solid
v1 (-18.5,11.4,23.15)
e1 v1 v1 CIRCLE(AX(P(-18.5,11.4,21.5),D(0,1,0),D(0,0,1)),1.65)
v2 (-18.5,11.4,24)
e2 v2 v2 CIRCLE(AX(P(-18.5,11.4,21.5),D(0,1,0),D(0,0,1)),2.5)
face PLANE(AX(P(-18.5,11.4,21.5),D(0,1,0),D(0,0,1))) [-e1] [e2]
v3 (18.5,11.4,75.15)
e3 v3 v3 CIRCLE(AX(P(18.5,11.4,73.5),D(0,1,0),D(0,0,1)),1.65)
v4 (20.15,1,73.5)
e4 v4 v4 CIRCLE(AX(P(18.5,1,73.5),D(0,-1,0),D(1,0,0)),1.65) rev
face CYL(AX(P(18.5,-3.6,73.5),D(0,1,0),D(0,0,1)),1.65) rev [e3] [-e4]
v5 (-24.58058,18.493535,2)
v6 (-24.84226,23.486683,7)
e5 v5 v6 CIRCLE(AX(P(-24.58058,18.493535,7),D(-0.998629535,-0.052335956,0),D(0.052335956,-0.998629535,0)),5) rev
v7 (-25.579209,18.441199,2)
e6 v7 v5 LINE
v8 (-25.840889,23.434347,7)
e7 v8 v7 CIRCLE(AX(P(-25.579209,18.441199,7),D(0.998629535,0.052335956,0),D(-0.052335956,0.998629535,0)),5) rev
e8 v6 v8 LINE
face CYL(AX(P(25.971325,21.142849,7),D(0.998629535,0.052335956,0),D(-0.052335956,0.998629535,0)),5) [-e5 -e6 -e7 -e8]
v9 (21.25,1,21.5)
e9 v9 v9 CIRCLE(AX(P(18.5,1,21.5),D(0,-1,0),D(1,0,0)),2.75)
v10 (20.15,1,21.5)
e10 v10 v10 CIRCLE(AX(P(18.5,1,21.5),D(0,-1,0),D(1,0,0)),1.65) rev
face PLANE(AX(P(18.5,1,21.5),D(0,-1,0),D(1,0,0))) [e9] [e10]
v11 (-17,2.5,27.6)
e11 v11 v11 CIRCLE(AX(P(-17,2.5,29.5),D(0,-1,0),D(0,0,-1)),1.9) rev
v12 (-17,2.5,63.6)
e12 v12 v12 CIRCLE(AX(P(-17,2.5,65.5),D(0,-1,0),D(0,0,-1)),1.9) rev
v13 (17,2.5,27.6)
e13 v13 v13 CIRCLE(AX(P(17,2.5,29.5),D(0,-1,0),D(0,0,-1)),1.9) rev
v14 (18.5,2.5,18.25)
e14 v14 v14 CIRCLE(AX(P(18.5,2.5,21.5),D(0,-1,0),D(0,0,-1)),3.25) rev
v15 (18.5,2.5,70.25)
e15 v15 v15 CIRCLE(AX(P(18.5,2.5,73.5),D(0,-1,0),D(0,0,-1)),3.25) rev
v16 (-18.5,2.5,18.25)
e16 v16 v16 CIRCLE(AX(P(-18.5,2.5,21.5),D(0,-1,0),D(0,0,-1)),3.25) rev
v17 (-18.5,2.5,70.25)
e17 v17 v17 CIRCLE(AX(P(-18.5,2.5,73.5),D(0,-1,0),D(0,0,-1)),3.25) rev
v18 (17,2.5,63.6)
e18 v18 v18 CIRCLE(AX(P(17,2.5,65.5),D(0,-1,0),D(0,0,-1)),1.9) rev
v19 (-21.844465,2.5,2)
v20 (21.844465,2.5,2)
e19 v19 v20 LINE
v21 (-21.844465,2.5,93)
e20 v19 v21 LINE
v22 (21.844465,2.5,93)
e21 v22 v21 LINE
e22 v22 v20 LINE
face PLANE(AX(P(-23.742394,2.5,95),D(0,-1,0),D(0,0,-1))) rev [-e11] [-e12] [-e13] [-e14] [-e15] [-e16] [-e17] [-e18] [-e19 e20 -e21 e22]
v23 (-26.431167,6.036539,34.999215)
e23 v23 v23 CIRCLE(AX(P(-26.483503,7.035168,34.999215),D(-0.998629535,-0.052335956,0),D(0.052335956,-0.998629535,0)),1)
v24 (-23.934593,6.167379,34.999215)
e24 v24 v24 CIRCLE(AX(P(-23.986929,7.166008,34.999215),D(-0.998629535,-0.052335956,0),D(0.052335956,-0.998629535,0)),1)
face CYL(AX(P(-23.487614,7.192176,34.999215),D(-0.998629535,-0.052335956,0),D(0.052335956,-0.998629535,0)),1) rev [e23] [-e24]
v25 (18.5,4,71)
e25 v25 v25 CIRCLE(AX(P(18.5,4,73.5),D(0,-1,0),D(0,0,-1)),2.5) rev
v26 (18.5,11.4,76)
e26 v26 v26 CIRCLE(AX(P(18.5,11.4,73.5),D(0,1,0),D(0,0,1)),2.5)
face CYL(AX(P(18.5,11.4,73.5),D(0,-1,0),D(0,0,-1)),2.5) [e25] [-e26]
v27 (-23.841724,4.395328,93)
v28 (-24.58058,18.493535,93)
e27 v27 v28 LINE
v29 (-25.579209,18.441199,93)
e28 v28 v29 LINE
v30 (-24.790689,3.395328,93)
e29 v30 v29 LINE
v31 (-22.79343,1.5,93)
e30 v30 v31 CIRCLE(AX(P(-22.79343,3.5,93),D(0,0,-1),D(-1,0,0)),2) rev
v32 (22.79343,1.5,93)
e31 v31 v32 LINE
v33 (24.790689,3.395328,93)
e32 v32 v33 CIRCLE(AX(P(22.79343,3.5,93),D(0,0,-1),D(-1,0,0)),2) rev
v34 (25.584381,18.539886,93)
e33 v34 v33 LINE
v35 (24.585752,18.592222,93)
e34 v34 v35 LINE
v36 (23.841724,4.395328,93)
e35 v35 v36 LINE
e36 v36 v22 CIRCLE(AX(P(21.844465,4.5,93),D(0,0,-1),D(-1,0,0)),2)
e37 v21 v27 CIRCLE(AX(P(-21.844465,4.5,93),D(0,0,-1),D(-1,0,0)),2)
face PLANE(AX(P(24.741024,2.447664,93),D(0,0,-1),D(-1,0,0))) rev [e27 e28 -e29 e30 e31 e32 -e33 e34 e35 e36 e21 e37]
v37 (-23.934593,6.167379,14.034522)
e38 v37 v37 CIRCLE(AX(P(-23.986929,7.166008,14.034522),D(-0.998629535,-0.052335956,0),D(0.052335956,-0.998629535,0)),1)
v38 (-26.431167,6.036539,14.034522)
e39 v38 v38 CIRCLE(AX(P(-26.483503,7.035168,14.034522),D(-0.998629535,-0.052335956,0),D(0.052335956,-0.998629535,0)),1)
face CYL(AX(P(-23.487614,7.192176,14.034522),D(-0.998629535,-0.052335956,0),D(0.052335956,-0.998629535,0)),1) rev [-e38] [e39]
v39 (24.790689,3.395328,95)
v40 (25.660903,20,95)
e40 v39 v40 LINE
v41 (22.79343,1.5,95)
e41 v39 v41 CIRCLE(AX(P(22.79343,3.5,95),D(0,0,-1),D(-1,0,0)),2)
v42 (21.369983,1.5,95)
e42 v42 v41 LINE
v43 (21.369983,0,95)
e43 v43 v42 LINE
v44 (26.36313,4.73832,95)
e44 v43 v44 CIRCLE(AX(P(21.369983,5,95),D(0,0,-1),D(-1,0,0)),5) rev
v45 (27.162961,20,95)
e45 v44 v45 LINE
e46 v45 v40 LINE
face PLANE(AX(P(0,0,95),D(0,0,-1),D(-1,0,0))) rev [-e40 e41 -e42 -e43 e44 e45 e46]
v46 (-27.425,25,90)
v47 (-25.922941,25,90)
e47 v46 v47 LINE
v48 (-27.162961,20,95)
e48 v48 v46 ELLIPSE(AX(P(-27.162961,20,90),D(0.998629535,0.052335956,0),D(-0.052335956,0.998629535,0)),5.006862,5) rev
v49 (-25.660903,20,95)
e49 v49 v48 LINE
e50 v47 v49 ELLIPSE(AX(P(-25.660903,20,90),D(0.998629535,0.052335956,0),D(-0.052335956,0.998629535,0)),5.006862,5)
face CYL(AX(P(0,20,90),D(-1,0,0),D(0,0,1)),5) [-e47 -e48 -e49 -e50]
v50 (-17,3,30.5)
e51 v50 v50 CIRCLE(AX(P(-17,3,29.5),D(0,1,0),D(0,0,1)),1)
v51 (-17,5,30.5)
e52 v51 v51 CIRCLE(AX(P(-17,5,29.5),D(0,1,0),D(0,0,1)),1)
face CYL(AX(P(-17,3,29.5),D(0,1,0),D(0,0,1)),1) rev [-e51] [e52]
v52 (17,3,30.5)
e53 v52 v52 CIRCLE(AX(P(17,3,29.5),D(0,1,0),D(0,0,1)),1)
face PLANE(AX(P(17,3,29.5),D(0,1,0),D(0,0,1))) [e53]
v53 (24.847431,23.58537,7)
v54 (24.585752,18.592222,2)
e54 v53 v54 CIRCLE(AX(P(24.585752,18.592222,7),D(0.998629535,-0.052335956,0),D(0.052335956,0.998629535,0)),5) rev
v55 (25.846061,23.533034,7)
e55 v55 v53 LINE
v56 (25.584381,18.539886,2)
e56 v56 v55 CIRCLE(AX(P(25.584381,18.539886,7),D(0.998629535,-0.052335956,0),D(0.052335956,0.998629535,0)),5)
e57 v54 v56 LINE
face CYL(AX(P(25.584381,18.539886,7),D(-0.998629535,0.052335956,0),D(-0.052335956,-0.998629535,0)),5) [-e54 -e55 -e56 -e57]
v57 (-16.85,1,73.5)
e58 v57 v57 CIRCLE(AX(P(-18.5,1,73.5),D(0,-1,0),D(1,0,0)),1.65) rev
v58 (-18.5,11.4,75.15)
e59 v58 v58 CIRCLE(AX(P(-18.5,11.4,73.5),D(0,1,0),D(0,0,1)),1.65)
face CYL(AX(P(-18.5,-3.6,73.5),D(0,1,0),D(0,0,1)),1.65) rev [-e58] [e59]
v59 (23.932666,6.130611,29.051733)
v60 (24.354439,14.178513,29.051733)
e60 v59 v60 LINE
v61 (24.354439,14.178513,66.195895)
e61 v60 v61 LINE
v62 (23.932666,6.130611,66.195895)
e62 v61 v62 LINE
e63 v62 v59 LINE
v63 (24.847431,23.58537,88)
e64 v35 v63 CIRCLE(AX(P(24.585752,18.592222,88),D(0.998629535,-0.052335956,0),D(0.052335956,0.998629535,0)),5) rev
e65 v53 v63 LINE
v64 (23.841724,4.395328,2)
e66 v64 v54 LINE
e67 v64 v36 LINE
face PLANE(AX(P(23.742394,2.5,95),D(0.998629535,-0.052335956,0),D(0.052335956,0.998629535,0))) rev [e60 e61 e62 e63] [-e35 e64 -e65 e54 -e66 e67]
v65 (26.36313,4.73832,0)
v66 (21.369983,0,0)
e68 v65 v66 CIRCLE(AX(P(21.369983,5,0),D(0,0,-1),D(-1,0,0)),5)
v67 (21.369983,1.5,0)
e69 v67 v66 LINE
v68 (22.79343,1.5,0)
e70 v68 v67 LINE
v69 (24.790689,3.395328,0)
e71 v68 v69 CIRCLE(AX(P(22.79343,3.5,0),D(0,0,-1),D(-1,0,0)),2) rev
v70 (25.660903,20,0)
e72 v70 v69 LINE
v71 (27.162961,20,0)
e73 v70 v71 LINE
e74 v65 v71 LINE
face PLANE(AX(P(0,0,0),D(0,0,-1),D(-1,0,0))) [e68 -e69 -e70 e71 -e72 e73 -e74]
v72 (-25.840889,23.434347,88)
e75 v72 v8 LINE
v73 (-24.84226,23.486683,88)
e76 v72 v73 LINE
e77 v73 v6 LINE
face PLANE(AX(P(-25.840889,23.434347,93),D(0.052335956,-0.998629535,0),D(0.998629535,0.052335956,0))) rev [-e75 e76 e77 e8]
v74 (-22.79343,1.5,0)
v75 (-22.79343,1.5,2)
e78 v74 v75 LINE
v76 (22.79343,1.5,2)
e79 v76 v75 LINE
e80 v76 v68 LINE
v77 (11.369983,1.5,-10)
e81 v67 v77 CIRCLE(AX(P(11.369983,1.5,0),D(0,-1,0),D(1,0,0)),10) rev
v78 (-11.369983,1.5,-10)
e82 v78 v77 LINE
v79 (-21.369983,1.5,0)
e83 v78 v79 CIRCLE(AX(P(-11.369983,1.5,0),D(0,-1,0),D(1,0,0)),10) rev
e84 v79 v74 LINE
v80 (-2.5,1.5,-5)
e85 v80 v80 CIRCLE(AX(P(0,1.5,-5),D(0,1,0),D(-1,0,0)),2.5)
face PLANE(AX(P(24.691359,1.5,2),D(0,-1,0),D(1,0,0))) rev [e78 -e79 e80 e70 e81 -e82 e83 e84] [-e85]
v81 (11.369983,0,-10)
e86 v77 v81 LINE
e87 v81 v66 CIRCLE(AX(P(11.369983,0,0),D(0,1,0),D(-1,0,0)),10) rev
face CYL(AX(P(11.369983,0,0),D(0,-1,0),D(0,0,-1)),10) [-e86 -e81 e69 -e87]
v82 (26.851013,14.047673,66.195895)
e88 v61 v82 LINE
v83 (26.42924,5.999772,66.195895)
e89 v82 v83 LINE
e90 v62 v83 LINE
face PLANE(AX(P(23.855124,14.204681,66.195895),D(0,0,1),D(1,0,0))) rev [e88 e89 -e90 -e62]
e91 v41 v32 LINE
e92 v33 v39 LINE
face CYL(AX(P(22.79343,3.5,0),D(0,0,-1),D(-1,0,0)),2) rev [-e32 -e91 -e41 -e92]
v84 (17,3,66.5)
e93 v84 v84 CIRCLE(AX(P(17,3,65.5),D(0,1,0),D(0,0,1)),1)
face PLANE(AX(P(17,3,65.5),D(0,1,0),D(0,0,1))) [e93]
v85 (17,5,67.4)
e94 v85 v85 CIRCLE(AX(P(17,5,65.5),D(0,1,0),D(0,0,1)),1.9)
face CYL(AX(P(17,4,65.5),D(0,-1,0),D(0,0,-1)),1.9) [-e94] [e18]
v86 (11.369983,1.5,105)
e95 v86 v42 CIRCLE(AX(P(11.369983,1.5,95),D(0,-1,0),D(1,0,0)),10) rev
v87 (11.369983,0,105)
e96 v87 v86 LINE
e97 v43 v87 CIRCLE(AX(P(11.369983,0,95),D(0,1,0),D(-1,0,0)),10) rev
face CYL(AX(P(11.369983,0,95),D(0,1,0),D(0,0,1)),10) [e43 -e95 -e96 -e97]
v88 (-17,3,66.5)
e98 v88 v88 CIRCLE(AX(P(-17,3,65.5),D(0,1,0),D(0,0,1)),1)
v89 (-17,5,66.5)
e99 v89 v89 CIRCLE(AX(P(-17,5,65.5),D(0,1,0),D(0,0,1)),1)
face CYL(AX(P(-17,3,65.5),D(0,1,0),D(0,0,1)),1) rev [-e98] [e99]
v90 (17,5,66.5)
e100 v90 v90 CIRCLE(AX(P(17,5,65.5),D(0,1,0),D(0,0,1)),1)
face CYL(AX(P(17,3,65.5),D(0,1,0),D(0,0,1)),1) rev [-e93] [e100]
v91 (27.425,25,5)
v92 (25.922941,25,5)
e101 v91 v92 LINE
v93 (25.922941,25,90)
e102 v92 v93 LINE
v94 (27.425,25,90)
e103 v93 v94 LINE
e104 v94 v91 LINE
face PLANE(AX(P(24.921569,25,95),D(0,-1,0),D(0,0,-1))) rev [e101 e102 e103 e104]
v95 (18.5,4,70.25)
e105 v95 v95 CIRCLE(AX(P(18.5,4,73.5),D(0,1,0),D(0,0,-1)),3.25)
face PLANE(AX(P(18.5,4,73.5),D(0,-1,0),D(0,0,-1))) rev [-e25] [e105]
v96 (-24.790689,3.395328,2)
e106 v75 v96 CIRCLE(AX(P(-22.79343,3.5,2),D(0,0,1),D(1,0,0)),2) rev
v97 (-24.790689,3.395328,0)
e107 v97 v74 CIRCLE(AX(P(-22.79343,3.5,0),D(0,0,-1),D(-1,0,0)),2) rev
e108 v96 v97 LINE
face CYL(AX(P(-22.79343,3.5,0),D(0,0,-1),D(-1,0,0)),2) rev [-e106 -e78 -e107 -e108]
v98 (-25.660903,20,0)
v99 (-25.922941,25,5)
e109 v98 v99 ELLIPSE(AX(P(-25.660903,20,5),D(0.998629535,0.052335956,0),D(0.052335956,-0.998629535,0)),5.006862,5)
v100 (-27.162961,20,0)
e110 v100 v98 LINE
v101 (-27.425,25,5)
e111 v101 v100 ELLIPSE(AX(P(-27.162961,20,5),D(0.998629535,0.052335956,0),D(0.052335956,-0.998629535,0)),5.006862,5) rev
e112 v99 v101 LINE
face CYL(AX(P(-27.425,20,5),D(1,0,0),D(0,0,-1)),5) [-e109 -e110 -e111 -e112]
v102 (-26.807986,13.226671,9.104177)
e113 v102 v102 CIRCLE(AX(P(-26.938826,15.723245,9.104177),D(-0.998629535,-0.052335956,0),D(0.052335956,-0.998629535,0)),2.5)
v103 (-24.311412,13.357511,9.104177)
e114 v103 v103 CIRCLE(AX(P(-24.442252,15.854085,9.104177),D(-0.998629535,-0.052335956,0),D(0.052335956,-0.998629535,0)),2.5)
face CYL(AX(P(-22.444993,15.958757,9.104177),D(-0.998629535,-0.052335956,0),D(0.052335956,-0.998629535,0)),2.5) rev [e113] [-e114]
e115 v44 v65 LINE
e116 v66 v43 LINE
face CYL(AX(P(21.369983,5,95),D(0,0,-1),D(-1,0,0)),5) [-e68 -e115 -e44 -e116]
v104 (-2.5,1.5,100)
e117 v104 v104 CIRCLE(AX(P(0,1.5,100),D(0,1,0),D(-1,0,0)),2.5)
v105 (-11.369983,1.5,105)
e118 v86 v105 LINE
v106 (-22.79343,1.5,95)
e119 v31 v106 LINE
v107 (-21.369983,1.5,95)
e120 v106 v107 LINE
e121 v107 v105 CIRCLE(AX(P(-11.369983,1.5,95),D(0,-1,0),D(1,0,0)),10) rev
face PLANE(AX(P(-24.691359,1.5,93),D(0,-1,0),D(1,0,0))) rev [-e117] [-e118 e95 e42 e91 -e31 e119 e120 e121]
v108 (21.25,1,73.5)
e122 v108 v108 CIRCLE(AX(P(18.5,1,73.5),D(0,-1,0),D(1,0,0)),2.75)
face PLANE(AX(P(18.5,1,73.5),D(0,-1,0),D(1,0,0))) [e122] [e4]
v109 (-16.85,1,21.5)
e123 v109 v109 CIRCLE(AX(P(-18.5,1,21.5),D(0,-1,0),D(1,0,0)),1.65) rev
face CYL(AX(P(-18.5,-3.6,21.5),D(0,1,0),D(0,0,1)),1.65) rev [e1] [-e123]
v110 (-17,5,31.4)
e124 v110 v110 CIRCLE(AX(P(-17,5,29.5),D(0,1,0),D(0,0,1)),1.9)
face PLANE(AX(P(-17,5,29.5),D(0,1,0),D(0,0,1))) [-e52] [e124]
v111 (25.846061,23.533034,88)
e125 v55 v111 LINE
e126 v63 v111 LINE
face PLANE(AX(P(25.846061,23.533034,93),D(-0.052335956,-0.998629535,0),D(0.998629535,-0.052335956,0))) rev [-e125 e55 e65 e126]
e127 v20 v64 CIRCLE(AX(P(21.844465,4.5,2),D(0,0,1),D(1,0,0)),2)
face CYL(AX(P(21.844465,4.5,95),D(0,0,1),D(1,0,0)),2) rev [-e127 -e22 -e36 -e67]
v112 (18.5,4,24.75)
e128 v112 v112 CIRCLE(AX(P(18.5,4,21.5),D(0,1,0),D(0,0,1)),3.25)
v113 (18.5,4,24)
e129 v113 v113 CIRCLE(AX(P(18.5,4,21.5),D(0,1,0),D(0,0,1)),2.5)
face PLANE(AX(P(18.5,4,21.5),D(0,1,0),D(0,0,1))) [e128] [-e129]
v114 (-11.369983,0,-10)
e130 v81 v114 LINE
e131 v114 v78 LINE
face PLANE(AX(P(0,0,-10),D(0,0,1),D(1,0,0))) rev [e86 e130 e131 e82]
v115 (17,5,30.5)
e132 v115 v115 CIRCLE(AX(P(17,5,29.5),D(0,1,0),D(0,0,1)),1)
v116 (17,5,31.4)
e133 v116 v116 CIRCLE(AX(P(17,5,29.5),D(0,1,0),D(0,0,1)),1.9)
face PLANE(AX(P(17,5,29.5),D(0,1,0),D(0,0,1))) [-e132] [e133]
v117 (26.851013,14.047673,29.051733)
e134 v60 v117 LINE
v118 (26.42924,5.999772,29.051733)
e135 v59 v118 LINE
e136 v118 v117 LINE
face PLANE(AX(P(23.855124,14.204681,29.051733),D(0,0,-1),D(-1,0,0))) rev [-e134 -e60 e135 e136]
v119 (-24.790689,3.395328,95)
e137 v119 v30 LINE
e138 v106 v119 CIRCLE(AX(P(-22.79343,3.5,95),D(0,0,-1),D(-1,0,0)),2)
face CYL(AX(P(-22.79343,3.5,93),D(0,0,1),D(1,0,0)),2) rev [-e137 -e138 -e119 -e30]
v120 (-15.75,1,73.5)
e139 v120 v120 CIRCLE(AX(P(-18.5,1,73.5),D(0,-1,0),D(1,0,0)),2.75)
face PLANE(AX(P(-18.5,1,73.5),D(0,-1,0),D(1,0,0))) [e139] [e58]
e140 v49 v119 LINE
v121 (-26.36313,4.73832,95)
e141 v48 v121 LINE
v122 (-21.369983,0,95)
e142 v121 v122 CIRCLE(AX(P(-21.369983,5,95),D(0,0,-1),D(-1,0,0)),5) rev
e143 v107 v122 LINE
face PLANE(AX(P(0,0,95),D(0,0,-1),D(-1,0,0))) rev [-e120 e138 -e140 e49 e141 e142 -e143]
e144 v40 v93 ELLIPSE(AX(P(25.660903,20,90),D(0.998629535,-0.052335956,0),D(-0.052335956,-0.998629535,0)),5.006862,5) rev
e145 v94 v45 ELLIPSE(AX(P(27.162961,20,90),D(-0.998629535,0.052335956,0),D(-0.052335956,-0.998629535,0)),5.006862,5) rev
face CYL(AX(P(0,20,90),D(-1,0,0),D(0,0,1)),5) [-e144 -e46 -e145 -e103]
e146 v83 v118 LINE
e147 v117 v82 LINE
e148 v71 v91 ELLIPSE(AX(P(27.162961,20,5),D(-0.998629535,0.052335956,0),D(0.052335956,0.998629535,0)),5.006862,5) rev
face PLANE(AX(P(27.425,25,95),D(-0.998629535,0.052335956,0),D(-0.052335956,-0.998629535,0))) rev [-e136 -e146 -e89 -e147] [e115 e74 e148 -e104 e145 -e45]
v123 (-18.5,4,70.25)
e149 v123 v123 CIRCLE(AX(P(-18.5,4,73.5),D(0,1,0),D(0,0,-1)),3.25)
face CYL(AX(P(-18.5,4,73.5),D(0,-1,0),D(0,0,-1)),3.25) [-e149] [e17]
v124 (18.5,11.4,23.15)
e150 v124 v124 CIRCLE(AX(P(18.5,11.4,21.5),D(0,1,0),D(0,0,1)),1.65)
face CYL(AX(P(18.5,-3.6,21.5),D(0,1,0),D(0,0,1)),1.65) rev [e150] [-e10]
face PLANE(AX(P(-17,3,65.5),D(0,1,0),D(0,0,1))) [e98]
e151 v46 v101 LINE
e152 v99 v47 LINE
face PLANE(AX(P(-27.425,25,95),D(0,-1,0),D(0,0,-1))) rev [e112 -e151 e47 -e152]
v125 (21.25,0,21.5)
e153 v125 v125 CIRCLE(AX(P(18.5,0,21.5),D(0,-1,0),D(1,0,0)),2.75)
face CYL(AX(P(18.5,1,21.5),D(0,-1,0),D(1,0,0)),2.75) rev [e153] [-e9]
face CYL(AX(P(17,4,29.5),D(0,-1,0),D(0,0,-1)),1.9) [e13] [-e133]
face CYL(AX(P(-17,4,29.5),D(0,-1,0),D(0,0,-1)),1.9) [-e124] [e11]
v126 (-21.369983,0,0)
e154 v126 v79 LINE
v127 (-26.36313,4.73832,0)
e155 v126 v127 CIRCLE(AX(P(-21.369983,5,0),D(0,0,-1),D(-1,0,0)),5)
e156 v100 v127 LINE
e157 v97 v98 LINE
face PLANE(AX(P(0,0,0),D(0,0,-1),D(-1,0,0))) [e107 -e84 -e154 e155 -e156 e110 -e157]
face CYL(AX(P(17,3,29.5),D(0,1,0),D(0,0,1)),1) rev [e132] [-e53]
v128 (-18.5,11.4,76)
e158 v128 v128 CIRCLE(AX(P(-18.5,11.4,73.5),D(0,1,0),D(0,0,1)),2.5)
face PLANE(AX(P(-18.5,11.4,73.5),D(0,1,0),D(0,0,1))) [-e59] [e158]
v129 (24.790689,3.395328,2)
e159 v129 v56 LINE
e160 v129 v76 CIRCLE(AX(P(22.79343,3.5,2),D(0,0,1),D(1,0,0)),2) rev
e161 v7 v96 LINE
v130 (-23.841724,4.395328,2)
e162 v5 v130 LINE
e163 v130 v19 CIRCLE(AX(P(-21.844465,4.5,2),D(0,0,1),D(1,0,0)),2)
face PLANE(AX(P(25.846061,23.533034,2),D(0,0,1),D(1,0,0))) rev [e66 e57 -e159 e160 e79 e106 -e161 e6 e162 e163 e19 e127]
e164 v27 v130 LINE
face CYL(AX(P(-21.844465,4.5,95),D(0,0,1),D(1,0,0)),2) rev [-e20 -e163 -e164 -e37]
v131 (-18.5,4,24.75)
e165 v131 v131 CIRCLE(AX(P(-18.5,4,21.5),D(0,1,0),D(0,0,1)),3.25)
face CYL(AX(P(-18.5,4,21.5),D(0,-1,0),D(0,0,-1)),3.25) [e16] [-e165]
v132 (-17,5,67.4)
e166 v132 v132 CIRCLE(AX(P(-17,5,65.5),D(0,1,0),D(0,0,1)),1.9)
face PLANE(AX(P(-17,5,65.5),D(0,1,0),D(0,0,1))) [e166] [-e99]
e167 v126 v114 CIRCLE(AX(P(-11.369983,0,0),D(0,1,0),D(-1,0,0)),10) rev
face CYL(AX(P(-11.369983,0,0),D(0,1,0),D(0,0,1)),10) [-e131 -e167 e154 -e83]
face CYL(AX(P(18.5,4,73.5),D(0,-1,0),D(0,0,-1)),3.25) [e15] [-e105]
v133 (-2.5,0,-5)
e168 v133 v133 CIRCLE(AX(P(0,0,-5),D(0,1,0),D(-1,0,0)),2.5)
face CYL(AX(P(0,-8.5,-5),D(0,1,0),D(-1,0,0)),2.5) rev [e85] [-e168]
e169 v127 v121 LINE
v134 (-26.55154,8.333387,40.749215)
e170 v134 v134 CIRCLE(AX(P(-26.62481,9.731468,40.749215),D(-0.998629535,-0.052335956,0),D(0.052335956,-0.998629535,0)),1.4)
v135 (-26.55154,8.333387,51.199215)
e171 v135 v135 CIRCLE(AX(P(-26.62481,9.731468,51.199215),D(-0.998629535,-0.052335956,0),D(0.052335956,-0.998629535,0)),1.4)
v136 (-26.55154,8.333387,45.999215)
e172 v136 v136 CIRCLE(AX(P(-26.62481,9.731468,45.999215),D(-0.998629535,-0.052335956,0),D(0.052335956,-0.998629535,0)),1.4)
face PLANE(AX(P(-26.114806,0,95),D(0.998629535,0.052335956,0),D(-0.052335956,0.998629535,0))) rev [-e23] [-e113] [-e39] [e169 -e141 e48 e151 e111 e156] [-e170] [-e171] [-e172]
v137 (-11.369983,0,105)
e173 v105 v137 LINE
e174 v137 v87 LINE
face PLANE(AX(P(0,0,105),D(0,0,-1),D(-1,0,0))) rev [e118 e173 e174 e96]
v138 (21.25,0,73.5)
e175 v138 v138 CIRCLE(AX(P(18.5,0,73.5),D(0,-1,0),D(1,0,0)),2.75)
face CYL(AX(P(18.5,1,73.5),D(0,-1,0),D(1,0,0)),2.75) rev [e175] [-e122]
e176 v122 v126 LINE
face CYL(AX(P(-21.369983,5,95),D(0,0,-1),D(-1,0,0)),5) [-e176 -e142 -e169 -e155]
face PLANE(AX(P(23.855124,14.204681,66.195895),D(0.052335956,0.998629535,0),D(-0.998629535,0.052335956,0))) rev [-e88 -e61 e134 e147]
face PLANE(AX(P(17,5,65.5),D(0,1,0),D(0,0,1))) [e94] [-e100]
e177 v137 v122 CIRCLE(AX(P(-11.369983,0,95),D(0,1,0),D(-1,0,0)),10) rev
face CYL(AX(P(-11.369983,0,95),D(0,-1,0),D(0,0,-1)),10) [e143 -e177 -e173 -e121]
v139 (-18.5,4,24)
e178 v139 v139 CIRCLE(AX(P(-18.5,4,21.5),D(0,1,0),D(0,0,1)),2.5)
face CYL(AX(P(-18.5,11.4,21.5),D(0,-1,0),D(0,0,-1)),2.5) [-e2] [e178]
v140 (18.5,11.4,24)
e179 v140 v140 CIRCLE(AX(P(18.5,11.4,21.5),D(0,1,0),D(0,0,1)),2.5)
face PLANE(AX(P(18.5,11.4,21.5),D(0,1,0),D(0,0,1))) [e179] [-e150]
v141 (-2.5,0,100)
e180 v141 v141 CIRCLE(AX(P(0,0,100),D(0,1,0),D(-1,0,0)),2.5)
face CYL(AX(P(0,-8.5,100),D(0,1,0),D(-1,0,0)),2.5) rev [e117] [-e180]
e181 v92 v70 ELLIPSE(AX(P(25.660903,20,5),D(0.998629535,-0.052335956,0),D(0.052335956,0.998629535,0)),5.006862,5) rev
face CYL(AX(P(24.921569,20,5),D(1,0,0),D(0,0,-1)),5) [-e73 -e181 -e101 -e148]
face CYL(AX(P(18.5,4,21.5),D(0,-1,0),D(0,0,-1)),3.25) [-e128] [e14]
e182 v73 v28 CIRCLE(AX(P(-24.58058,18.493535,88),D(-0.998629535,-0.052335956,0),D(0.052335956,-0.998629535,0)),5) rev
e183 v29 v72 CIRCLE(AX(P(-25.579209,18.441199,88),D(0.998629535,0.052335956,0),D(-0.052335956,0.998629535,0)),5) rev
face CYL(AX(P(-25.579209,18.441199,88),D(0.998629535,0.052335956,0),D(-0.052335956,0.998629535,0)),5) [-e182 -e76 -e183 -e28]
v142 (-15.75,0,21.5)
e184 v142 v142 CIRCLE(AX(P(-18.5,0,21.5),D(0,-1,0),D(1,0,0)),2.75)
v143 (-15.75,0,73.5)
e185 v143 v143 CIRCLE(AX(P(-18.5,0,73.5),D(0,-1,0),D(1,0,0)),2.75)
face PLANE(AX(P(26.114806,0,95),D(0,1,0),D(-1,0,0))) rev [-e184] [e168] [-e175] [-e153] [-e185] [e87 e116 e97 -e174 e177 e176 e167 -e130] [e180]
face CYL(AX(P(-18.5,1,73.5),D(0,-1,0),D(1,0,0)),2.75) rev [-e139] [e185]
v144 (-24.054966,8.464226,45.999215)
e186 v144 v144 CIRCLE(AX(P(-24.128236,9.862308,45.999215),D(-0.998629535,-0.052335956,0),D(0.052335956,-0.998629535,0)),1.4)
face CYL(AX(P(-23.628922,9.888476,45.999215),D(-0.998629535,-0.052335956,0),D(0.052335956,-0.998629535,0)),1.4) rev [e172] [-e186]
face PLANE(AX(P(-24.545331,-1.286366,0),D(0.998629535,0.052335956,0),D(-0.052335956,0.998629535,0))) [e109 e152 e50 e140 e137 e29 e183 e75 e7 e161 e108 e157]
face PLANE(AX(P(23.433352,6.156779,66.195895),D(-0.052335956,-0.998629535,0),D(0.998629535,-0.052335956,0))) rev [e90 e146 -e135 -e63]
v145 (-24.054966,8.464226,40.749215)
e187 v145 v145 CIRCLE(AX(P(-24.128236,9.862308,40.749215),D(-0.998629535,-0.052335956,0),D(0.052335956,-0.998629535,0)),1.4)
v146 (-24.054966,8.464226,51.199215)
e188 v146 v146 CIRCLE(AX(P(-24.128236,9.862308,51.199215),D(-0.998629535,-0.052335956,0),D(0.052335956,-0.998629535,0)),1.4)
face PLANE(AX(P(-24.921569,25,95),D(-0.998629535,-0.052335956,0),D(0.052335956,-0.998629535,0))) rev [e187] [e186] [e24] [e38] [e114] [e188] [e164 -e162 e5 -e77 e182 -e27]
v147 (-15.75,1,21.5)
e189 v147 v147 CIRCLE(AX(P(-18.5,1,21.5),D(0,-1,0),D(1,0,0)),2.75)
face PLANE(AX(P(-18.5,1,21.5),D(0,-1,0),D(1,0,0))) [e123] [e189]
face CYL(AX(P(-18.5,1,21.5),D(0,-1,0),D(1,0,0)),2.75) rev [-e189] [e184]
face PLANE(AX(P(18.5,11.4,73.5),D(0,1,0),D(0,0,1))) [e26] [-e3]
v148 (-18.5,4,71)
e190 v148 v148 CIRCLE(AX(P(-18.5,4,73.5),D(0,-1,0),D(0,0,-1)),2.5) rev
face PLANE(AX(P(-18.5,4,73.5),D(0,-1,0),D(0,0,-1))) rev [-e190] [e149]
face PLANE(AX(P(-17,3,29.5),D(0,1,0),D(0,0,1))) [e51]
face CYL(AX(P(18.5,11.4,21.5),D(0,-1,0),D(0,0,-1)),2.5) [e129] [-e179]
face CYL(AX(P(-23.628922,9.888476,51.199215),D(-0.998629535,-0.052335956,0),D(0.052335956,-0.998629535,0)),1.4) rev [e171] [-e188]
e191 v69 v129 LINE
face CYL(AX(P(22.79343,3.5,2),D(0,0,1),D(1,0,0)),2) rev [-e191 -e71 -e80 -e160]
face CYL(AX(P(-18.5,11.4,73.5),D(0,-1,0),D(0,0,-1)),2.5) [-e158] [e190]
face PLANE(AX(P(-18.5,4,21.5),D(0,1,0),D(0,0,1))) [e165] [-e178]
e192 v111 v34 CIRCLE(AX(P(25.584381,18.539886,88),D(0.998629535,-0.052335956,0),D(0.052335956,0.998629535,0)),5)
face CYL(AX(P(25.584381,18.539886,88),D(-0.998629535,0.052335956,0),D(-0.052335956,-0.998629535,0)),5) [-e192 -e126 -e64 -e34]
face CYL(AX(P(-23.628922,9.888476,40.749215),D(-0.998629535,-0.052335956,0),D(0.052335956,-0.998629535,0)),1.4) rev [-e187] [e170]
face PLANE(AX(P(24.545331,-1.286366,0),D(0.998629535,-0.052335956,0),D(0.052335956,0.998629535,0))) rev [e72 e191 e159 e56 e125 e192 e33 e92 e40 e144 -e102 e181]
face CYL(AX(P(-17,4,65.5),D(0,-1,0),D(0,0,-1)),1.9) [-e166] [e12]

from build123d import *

# Parameters (mm, degrees)
BOSS_EXTRUDE1_DEPTH = 95
CUT_EXTRUDE1_DEPTH  = 1
CUT_EXTRUDE2_DEPTH  = 1
CUT_EXTRUDE4_DEPTH  = 2
CUT_EXTRUDE5_DEPTH  = 2
FILLET1_R           = 2
FILLET2_R           = 5
FILLET3_R           = 5
SKETCH11_R          = 3.25
SKETCH11_R_2        = 1.9
BOSS_EXTRUDE2_DEPTH = 1.5
SKETCH13_R          = 2.5
BOSS_EXTRUDE3_DEPTH = 7.4
SKETCH14_R          = 1.9
BOSS_EXTRUDE4_DEPTH = 1
SKETCH15_R          = 1.65
CUT_EXTRUDE7_DEPTH  = 15
SKETCH16_R          = 2.75
CUT_EXTRUDE8_DEPTH  = 1
SKETCH17_R          = 1
CUT_EXTRUDE9_DEPTH  = 2
SKETCH18_W          = 37.144162516
SKETCH18_H          = 8.058946384
CUT_EXTRUDE10_DEPTH = 3
SKETCH19_R          = 1
SKETCH19_R_2        = 1.4
CUT_EXTRUDE11_DEPTH = 3
SKETCH20_W          = 42.739965368
SKETCH20_H          = 1.5
BOSS_EXTRUDE5_DEPTH = 10
FILLET4_R           = 10
SKETCH21_W          = 42.739965368
SKETCH21_H          = 1.5
BOSS_EXTRUDE6_DEPTH = 10
FILLET5_R           = 10
SKETCH22_R          = 2.5
CUT_EXTRUDE12_DEPTH = 10
SKETCH23_R          = 2.5
CUT_EXTRUDE13_DEPTH = 4.5


with BuildPart() as part:
    # Sketch1 → Boss-Extrude1 (new body)
    with BuildSketch(Plane.XY):
        Polygon((-26.114805518, 0), (-27.425, 25), (-24.921569135, 25), (-23.742394101, 2.5), (23.742394101, 2.5), (24.921569135, 25), (27.425, 25), (26.114805518, 0), align=None)
    extrude(amount=BOSS_EXTRUDE1_DEPTH)

    # Sketch2 → Cut-Extrude1 (cut)
    with BuildSketch(Plane(origin=(23.546701863, -1.234030354, 0), x_dir=(0, 0, 1), z_dir=(-0.9986295347545742, 0.052335956242940705, 0))):
        Polygon((93, 3.739154736), (93, 24.853460661), (2, 24.853460661), (2, 3.739154736), (0, 3.739154736), (0, 26.853460661), (95, 26.853460661), (95, 3.739154736), align=None)
    extrude(amount=-CUT_EXTRUDE1_DEPTH, mode=Mode.SUBTRACT)

    # Sketch4 → Cut-Extrude2 (cut)
    with BuildSketch(Plane(origin=(-23.546701863, -1.234030354, 0), x_dir=(0, 0, -1), z_dir=(0.9986295347545742, 0.052335956242940414, 0))):
        Polygon((-95, 3.739154736), (-93, 3.739154736), (-93, 24.754638821), (-2, 24.754638821), (-2, 3.739154736), (0, 3.739154736), (0, 26.754638821), (-95, 26.754638821), align=None)
    extrude(amount=-CUT_EXTRUDE2_DEPTH, mode=Mode.SUBTRACT)

    # Sketch9 → Cut-Extrude4 (cut)
    with BuildSketch(Plane.XY.offset(95)):
        Polygon((-24.741023636, 2.447664044), (-24.691358668, 1.5), (24.691358668, 1.5), (24.743766447, 2.5), (23.742394101, 2.5), (-23.742394101, 2.5), (-24.743766447, 2.5), align=None)
    extrude(amount=-CUT_EXTRUDE4_DEPTH, mode=Mode.SUBTRACT)

    # Sketch10 → Cut-Extrude5 (cut)
    with BuildSketch(Plane(origin=(0, 0, 0), x_dir=(-1, 0, 0), z_dir=(0, 0, -1))):
        Polygon((-24.741023636, 2.447664044), (-24.691358668, 1.5), (24.691358668, 1.5), (24.741023636, 2.447664044), (24.743766447, 2.5), (23.742394101, 2.5), (-23.742394101, 2.5), (-24.743766447, 2.5), align=None)
    extrude(amount=-CUT_EXTRUDE5_DEPTH, mode=Mode.SUBTRACT)

    # Fillet1
    fillet1_edges = [part.edges().sort_by_distance(p)[0] for p in [
        (24.691358668, 1.5, 1),
        (-24.691358668, 1.5, 1),
        (23.742394101, 2.5, 47.5),
        (-23.742394101, 2.5, 47.5),
        (-24.691358668, 1.5, 94),
        (24.691358668, 1.5, 94),
    ]]
    fillet(fillet1_edges, radius=FILLET1_R)

    # Fillet2
    fillet2_edges = [part.edges().sort_by_distance(p)[0] for p in [
        (26.673970741, 25, 95),
        (25.34674626, 23.559201525, 93),
        (25.34674626, 23.559201525, 2),
        (-26.673970741, 25, 0),
        (-26.673970741, 25, 95),
        (-25.341574324, 23.460515117, 2),
        (-25.341574324, 23.460515117, 93),
        (26.673970741, 25, 0),
    ]]
    fillet(fillet2_edges, radius=FILLET2_R)

    # Fillet3
    fillet3_edges = [part.edges().sort_by_distance(p)[0] for p in [
        (-26.114805518, 0, 47.5),
        (26.114805518, 0, 47.5),
    ]]
    fillet(fillet3_edges, radius=FILLET3_R)

    # Sketch11 → Boss-Extrude2 (add)
    with BuildSketch(Plane(origin=(0, 2.5, 0), x_dir=(1, 0, 0), z_dir=(0, 1, 0))):
        with Locations(Location((-18.5, -21.5, 0), (0, 0, 90))):
            Circle(SKETCH11_R)
        with Locations(Location((18.5, -21.5, 0), (0, 0, 90))):
            Circle(SKETCH11_R)
        with Locations(Location((-17, -29.5, 0), (0, 0, 90))):
            Circle(SKETCH11_R_2)
        with Locations(Location((17, -29.5, 0), (0, 0, 90))):
            Circle(SKETCH11_R_2)
        with Locations(Location((18.5, -73.5, 0), (0, 0, 90))):
            Circle(SKETCH11_R)
        with Locations(Location((17, -65.5, 0), (0, 0, 90))):
            Circle(SKETCH11_R_2)
        with Locations(Location((-18.5, -73.5, 0), (0, 0, 90))):
            Circle(SKETCH11_R)
        with Locations(Location((-17, -65.5, 0), (0, 0, 90))):
            Circle(SKETCH11_R_2)
    extrude(amount=BOSS_EXTRUDE2_DEPTH)

    # Sketch13 → Boss-Extrude3 (add)
    with BuildSketch(Plane(origin=(0, 4, 0), x_dir=(1, 0, 0), z_dir=(0, 1, 0))):
        with Locations(Location((-18.5, -21.5, 0), (0, 0, 270))):
            Circle(SKETCH13_R)
        with Locations(Location((18.5, -21.5, 0), (0, 0, 270))):
            Circle(SKETCH13_R)
        with Locations(Location((-18.5, -73.5, 0), (0, 0, 90))):
            Circle(SKETCH13_R)
        with Locations(Location((18.5, -73.5, 0), (0, 0, 90))):
            Circle(SKETCH13_R)
    extrude(amount=BOSS_EXTRUDE3_DEPTH)

    # Sketch14 → Boss-Extrude4 (add)
    with BuildSketch(Plane(origin=(0, 4, 0), x_dir=(1, 0, 0), z_dir=(0, 1, 0))):
        with Locations(Location((-17, -29.5, 0), (0, 0, 90))):
            Circle(SKETCH14_R)
        with Locations(Location((17, -29.5, 0), (0, 0, 90))):
            Circle(SKETCH14_R)
        with Locations(Location((-17, -65.5, 0), (0, 0, 90))):
            Circle(SKETCH14_R)
        with Locations(Location((17, -65.5, 0), (0, 0, 90))):
            Circle(SKETCH14_R)
    extrude(amount=BOSS_EXTRUDE4_DEPTH)

    # Sketch15 → Cut-Extrude7 (cut)
    with BuildSketch(Plane(origin=(0, 11.4, 0), x_dir=(1, 0, 0), z_dir=(0, 1, 0))):
        with Locations(Location((-18.5, -21.5, 0), (0, 0, 270))):
            Circle(SKETCH15_R)
        with Locations(Location((18.5, -21.5, 0), (0, 0, 270))):
            Circle(SKETCH15_R)
        with Locations(Location((18.5, -73.5, 0), (0, 0, 270))):
            Circle(SKETCH15_R)
        with Locations(Location((-18.5, -73.5, 0), (0, 0, 270))):
            Circle(SKETCH15_R)
    extrude(amount=-CUT_EXTRUDE7_DEPTH, mode=Mode.SUBTRACT)

    # Sketch16 → Cut-Extrude8 (cut)
    with BuildSketch(Plane.XZ):
        with Locations((18.5, 21.5)):
            Circle(SKETCH16_R)
        with Locations((-18.5, 21.5)):
            Circle(SKETCH16_R)
        with Locations((18.5, 73.5)):
            Circle(SKETCH16_R)
        with Locations((-18.5, 73.5)):
            Circle(SKETCH16_R)
    extrude(amount=-CUT_EXTRUDE8_DEPTH, mode=Mode.SUBTRACT)

    # Sketch17 → Cut-Extrude9 (cut)
    with BuildSketch(Plane(origin=(0, 5, 0), x_dir=(1, 0, 0), z_dir=(0, 1, 0))):
        with Locations(Location((-17, -29.5, 0), (0, 0, 270))):
            Circle(SKETCH17_R)
        with Locations(Location((-17, -65.5, 0), (0, 0, 270))):
            Circle(SKETCH17_R)
        with Locations(Location((17, -65.5, 0), (0, 0, 270))):
            Circle(SKETCH17_R)
        with Locations(Location((17, -29.5, 0), (0, 0, 270))):
            Circle(SKETCH17_R)
    extrude(amount=-CUT_EXTRUDE9_DEPTH, mode=Mode.SUBTRACT)

    # Sketch18 → Cut-Extrude10 (cut)
    with BuildSketch(Plane(origin=(26.043275699, -1.364870245, 0), x_dir=(0, 0, -1), z_dir=(0.9986295347545742, -0.05233595624294077, 0))):
        with Locations((-47.623813875, 11.404221833)):
            Rectangle(SKETCH18_W, SKETCH18_H)
    extrude(amount=-CUT_EXTRUDE10_DEPTH, mode=Mode.SUBTRACT)

    # Sketch19 → Cut-Extrude11 (cut)
    with BuildSketch(Plane(origin=(-26.043275699, -1.364870245, 0), x_dir=(0, 0, 1), z_dir=(-0.9986295347545742, -0.05233595624294044, 0))):
        with Locations(Location((14.034522451, 8.411566152, 0), (0, 0, 270))):
            Circle(SKETCH19_R)
        with Locations(Location((34.99921548, 8.411566152, 0), (0, 0, 270))):
            Circle(SKETCH19_R)
        with Locations(Location((40.74921548, 11.111566152, 0), (0, 0, 270))):
            Circle(SKETCH19_R_2)
        with Locations(Location((45.99921548, 11.111566152, 0), (0, 0, 270))):
            Circle(SKETCH19_R_2)
        with Locations(Location((51.19921548, 11.111566152, 0), (0, 0, 270))):
            Circle(SKETCH19_R_2)
    extrude(amount=-CUT_EXTRUDE11_DEPTH, mode=Mode.SUBTRACT)

    # Sketch20 → Boss-Extrude5 (add)
    with BuildSketch(Plane(origin=(0, 0, 0), x_dir=(-1, 0, 0), z_dir=(0, 0, -1))):
        with Locations((0, 0.75)):
            Rectangle(SKETCH20_W, SKETCH20_H)
    extrude(amount=BOSS_EXTRUDE5_DEPTH)

    # Fillet4
    fillet4_edges = [part.edges().sort_by_distance(p)[0] for p in [
        (21.369982684, 0.75, -10),
        (-21.369982684, 0.75, -10),
    ]]
    fillet(fillet4_edges, radius=FILLET4_R - 0.0001)  # a hair under: the kernel refuses the full size

    # Sketch21 → Boss-Extrude6 (add)
    with BuildSketch(Plane.XY.offset(95)):
        with Locations((0, 0.75)):
            Rectangle(SKETCH21_W, SKETCH21_H)
    extrude(amount=BOSS_EXTRUDE6_DEPTH)

    # Fillet5
    fillet5_edges = [part.edges().sort_by_distance(p)[0] for p in [
        (-21.369982684, 0.75, 105),
        (21.369982684, 0.75, 105),
    ]]
    fillet(fillet5_edges, radius=FILLET5_R - 0.0001)  # a hair under: the kernel refuses the full size

    # Sketch22 → Cut-Extrude12 (cut)
    with BuildSketch(Plane(origin=(0, 1.5, 0), x_dir=(1, 0, 0), z_dir=(0, 1, 0))):
        with Locations(Location((0, 5, 0), (0, 0, 180))):
            Circle(SKETCH22_R)
        with Locations(Location((0, -100, 0), (0, 0, 180))):
            Circle(SKETCH22_R)
    extrude(amount=-CUT_EXTRUDE12_DEPTH, mode=Mode.SUBTRACT)

    # Sketch23 → Cut-Extrude13 (cut)
    with BuildSketch(Plane(origin=(-26.043275699, -1.364870245, 0), x_dir=(0, 0, 1), z_dir=(-0.9986295347545742, -0.052335956242940324, 0))):
        with Locations(Location((9.104177009, 17.111566152, 0), (0, 0, 270))):
            Circle(SKETCH23_R)
    extrude(amount=-CUT_EXTRUDE13_DEPTH, mode=Mode.SUBTRACT)


solid = part.part
